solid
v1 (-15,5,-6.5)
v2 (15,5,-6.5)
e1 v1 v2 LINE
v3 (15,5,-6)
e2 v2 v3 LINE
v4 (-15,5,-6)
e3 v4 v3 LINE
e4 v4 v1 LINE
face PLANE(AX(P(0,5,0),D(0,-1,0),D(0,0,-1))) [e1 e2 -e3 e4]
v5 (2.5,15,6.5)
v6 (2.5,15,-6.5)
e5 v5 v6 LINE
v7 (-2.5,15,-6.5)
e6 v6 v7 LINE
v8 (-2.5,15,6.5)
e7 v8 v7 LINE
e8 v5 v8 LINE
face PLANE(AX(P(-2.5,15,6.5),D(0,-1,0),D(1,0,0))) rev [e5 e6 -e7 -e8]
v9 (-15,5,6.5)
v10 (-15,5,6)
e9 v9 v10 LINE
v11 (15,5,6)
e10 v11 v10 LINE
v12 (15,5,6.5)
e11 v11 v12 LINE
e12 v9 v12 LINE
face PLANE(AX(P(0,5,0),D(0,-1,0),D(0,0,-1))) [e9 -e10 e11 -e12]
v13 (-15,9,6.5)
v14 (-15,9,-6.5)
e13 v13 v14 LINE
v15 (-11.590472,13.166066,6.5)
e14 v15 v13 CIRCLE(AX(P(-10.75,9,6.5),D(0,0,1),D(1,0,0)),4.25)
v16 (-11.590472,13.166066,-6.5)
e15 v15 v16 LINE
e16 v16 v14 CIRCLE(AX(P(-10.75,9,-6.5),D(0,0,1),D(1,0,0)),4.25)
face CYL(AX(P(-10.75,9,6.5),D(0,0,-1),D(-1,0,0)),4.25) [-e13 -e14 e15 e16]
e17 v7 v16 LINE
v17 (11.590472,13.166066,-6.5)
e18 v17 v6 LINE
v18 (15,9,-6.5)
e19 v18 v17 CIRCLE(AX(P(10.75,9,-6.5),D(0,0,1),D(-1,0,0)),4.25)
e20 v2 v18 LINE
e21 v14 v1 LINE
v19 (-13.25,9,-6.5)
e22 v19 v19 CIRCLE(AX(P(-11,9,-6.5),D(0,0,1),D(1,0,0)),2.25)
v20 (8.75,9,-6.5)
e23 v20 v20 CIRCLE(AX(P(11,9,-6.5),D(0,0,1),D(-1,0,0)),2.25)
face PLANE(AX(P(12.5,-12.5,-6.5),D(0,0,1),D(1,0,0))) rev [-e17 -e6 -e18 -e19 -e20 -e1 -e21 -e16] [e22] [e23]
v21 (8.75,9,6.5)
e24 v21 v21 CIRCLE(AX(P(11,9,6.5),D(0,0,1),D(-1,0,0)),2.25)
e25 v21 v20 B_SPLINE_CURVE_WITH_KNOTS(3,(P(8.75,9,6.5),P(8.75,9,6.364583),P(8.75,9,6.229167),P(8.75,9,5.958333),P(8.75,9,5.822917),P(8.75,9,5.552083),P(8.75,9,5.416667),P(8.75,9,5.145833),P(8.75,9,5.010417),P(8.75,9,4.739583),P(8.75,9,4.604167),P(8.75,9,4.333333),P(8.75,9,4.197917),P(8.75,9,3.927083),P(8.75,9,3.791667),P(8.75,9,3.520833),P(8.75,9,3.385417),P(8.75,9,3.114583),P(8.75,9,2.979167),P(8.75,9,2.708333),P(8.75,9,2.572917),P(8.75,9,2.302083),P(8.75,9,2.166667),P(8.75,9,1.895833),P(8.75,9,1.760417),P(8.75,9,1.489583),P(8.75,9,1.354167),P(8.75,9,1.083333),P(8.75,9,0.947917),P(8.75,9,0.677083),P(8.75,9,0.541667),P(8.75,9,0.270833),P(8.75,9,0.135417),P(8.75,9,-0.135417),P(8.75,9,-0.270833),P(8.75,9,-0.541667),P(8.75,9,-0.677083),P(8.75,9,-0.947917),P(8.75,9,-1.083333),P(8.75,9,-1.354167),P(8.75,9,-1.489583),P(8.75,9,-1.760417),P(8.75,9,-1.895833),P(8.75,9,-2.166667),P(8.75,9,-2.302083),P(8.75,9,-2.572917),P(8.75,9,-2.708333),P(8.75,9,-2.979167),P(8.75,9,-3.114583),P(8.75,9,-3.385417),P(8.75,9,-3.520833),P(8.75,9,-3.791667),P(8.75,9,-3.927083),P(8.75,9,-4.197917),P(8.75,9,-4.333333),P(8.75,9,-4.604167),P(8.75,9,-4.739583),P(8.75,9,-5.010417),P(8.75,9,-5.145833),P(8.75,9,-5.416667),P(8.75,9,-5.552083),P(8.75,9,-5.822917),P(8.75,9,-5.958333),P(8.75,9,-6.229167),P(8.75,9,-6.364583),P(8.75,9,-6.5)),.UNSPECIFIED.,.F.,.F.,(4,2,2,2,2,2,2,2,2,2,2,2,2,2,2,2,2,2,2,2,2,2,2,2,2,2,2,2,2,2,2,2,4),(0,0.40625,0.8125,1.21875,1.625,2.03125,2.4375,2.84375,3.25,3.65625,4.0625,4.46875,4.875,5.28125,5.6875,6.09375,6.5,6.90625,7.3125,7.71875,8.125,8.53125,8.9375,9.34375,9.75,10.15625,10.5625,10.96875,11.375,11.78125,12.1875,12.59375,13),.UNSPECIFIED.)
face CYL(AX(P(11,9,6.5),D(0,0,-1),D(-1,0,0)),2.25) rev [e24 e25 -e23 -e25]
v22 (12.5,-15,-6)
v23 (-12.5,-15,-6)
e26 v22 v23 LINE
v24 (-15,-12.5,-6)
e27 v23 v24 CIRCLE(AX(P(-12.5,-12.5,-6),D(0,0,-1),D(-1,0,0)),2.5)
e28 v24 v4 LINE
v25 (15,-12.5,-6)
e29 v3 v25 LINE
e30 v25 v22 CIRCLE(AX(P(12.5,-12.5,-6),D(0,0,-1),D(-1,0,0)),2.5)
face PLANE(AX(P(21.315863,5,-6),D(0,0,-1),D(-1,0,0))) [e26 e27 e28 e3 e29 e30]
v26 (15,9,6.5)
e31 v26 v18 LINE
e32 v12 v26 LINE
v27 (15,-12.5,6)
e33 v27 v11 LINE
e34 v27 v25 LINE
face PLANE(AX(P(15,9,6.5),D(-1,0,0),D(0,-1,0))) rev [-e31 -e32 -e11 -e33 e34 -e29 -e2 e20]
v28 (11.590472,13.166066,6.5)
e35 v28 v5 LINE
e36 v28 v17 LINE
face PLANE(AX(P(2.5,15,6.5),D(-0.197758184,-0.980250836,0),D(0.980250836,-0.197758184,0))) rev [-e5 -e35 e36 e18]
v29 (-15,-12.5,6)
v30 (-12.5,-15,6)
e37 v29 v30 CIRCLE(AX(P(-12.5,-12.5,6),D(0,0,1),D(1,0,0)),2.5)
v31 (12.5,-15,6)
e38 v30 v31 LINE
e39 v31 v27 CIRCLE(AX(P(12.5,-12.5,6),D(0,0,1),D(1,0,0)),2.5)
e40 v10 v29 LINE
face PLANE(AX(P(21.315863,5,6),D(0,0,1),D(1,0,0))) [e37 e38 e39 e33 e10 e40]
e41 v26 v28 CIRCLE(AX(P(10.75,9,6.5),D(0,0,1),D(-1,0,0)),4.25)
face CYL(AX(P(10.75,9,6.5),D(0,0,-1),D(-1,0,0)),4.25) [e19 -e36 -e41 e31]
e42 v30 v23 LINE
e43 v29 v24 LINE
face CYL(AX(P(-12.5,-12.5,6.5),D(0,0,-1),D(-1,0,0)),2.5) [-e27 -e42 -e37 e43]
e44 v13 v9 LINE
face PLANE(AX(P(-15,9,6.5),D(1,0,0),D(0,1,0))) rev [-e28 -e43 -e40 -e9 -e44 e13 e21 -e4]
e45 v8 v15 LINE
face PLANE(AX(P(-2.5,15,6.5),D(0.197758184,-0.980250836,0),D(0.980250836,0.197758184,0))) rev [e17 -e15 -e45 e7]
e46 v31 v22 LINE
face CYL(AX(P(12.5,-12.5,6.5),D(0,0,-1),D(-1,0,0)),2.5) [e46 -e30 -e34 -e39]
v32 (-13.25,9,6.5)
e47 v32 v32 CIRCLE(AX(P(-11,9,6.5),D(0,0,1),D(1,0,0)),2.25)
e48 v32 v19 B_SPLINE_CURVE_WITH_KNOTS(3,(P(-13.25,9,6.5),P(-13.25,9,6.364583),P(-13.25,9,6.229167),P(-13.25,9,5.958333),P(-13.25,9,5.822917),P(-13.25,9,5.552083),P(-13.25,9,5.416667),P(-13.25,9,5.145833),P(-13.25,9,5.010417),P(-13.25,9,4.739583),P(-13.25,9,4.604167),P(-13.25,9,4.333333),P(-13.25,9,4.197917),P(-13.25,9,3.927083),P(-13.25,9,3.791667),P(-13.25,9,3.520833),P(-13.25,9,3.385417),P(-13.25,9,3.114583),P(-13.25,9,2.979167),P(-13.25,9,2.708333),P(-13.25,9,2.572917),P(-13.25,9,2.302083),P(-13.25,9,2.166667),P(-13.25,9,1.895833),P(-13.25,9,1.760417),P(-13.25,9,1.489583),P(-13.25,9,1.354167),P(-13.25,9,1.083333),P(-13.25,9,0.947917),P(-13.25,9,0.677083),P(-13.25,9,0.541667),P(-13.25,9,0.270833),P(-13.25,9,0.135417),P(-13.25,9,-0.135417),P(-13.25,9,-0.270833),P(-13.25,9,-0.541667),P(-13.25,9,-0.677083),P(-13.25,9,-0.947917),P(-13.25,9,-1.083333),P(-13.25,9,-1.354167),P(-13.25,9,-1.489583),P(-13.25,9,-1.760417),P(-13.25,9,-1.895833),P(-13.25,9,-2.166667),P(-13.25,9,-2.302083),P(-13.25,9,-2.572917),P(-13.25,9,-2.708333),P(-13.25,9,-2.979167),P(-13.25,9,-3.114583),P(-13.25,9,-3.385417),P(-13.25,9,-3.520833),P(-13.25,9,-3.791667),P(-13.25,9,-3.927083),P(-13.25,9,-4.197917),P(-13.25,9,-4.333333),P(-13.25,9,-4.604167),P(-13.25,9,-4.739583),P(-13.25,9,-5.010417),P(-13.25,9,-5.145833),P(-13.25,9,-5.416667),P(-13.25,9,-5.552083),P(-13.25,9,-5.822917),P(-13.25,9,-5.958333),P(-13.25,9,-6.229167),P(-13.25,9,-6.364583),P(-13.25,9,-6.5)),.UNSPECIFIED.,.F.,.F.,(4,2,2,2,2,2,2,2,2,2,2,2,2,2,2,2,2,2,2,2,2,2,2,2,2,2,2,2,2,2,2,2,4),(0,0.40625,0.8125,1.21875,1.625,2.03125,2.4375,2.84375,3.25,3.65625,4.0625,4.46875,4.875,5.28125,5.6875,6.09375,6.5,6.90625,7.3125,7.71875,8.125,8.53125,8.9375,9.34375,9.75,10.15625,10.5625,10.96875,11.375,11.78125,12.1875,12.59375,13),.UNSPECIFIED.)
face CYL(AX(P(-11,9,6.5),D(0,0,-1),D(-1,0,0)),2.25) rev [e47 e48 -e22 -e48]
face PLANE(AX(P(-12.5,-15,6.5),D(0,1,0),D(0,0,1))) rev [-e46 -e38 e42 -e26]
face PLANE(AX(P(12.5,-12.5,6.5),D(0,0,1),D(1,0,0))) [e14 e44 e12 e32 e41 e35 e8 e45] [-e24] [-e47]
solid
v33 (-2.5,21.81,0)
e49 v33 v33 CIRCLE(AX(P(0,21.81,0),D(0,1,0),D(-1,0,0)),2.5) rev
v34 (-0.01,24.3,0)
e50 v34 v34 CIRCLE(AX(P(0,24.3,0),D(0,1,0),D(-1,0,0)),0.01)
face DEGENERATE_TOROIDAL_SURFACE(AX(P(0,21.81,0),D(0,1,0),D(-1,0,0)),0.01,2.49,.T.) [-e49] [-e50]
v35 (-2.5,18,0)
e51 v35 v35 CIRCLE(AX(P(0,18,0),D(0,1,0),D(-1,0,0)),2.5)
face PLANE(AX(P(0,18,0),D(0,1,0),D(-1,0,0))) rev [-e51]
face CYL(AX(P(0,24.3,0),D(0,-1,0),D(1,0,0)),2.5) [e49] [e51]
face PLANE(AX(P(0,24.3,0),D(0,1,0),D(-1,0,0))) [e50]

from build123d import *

# Parameters (mm, degrees)
SKETCH1_R              = 2.25
BOSS_EXTRUDE1_DEPTH    = 6.5
SKETCH2_R              = 2.5
BOSS_EXTRUDE2_DEPTH    = 9.3
FILLET1_R              = 2.49
CUT_EXTRUDE1_START     = -20
CUT_EXTRUDE1_OUTLINE_W = 30
CUT_EXTRUDE1_OUTLINE_H = 0.5
CUT_EXTRUDE1_DEPTH     = 20
CUT_EXTRUDE4_START     = -3
SKETCH6_R              = 2.5
CUT_EXTRUDE4_DEPTH     = 3


# Read off the part's stored shape, not the designer's step: Cut-Extrude1
with BuildPart() as part:
    # Sketch1 → Boss-Extrude1 (new, symmetric)
    with BuildSketch(Plane.XY):
        with BuildLine():
            Line((-2.5, 15), (-11.59047228, 13.166066052))
            ThreePointArc((-11.59047228, 13.166066052), (-14.038959348, 11.691699538), (-15, 9))
            Line((-15, 9), (-15, -12.5))
            ThreePointArc((-15, -12.5), (-14.267766953, -14.267766953), (-12.5, -15))
            Line((-12.5, -15), (12.5, -15))
            ThreePointArc((12.5, -15), (14.267766953, -14.267766953), (15, -12.5))
            Line((15, -12.5), (15, 9))
            ThreePointArc((15, 9), (14.038959348, 11.691699538), (11.59047228, 13.166066052))
            Line((11.59047228, 13.166066052), (2.5, 15))
            Line((2.5, 15), (-2.5, 15))
        make_face()
        with Locations(Location((-11, 9, 0), (0, 0, 180))):
            Circle(SKETCH1_R, mode=Mode.SUBTRACT)
        with Locations(Location((11, 9, 0), (0, 0, 180))):
            Circle(SKETCH1_R, mode=Mode.SUBTRACT)
    extrude(amount=BOSS_EXTRUDE1_DEPTH, both=True)

    # Sketch2 → Boss-Extrude2 (add)
    with BuildSketch(Plane(origin=(0, 15, 0), x_dir=(1, 0, 0), z_dir=(0, 1, 0))):
        with Locations(Location((0, 0, 0), (0, 0, 180))):
            Circle(SKETCH2_R)
    extrude(amount=BOSS_EXTRUDE2_DEPTH)

    # Fillet1
    fillet1_edges = [part.edges().sort_by_distance(p)[0] for p in [
        (2.5, 24.3, 0),
    ]]
    fillet(fillet1_edges, radius=FILLET1_R)

    # Cut-Extrude1 outline → Cut-Extrude1 (cut)
    with BuildSketch(Plane.XZ.offset(15).offset(CUT_EXTRUDE1_START)):
        with Locations((0, -6.25)):
            Rectangle(CUT_EXTRUDE1_OUTLINE_W, CUT_EXTRUDE1_OUTLINE_H)
        with Locations((0, 6.25)):
            Rectangle(CUT_EXTRUDE1_OUTLINE_W, CUT_EXTRUDE1_OUTLINE_H)
    extrude(amount=CUT_EXTRUDE1_DEPTH, mode=Mode.SUBTRACT)

    # Sketch6 → Cut-Extrude4 (cut)
    with BuildSketch(Plane(origin=(0, 18, -31.4), x_dir=(0, 0, 1), z_dir=(0, 1, 0)).offset(CUT_EXTRUDE4_START)):
        with Locations(Location((31.4, 0, 0), (0, 0, 270))):
            Circle(SKETCH6_R)
    extrude(amount=CUT_EXTRUDE4_DEPTH, mode=Mode.SUBTRACT)


with BuildPart() as cut_extrude4_piece_1:
    # of the separate pieces the step leaves, piece 1, a body of its own (cut_extrude4_pieces)
    add(part.part.solids().sort_by_distance((2.5, 15, 6.5))[0])


with BuildPart() as cut_extrude4_piece_2:
    # of the separate pieces the step leaves, piece 2, a body of its own (cut_extrude4_pieces)
    add(part.part.solids().sort_by_distance((-2.5, 18, 0))[0])


solid = Compound([cut_extrude4_piece_1.part, cut_extrude4_piece_2.part])
